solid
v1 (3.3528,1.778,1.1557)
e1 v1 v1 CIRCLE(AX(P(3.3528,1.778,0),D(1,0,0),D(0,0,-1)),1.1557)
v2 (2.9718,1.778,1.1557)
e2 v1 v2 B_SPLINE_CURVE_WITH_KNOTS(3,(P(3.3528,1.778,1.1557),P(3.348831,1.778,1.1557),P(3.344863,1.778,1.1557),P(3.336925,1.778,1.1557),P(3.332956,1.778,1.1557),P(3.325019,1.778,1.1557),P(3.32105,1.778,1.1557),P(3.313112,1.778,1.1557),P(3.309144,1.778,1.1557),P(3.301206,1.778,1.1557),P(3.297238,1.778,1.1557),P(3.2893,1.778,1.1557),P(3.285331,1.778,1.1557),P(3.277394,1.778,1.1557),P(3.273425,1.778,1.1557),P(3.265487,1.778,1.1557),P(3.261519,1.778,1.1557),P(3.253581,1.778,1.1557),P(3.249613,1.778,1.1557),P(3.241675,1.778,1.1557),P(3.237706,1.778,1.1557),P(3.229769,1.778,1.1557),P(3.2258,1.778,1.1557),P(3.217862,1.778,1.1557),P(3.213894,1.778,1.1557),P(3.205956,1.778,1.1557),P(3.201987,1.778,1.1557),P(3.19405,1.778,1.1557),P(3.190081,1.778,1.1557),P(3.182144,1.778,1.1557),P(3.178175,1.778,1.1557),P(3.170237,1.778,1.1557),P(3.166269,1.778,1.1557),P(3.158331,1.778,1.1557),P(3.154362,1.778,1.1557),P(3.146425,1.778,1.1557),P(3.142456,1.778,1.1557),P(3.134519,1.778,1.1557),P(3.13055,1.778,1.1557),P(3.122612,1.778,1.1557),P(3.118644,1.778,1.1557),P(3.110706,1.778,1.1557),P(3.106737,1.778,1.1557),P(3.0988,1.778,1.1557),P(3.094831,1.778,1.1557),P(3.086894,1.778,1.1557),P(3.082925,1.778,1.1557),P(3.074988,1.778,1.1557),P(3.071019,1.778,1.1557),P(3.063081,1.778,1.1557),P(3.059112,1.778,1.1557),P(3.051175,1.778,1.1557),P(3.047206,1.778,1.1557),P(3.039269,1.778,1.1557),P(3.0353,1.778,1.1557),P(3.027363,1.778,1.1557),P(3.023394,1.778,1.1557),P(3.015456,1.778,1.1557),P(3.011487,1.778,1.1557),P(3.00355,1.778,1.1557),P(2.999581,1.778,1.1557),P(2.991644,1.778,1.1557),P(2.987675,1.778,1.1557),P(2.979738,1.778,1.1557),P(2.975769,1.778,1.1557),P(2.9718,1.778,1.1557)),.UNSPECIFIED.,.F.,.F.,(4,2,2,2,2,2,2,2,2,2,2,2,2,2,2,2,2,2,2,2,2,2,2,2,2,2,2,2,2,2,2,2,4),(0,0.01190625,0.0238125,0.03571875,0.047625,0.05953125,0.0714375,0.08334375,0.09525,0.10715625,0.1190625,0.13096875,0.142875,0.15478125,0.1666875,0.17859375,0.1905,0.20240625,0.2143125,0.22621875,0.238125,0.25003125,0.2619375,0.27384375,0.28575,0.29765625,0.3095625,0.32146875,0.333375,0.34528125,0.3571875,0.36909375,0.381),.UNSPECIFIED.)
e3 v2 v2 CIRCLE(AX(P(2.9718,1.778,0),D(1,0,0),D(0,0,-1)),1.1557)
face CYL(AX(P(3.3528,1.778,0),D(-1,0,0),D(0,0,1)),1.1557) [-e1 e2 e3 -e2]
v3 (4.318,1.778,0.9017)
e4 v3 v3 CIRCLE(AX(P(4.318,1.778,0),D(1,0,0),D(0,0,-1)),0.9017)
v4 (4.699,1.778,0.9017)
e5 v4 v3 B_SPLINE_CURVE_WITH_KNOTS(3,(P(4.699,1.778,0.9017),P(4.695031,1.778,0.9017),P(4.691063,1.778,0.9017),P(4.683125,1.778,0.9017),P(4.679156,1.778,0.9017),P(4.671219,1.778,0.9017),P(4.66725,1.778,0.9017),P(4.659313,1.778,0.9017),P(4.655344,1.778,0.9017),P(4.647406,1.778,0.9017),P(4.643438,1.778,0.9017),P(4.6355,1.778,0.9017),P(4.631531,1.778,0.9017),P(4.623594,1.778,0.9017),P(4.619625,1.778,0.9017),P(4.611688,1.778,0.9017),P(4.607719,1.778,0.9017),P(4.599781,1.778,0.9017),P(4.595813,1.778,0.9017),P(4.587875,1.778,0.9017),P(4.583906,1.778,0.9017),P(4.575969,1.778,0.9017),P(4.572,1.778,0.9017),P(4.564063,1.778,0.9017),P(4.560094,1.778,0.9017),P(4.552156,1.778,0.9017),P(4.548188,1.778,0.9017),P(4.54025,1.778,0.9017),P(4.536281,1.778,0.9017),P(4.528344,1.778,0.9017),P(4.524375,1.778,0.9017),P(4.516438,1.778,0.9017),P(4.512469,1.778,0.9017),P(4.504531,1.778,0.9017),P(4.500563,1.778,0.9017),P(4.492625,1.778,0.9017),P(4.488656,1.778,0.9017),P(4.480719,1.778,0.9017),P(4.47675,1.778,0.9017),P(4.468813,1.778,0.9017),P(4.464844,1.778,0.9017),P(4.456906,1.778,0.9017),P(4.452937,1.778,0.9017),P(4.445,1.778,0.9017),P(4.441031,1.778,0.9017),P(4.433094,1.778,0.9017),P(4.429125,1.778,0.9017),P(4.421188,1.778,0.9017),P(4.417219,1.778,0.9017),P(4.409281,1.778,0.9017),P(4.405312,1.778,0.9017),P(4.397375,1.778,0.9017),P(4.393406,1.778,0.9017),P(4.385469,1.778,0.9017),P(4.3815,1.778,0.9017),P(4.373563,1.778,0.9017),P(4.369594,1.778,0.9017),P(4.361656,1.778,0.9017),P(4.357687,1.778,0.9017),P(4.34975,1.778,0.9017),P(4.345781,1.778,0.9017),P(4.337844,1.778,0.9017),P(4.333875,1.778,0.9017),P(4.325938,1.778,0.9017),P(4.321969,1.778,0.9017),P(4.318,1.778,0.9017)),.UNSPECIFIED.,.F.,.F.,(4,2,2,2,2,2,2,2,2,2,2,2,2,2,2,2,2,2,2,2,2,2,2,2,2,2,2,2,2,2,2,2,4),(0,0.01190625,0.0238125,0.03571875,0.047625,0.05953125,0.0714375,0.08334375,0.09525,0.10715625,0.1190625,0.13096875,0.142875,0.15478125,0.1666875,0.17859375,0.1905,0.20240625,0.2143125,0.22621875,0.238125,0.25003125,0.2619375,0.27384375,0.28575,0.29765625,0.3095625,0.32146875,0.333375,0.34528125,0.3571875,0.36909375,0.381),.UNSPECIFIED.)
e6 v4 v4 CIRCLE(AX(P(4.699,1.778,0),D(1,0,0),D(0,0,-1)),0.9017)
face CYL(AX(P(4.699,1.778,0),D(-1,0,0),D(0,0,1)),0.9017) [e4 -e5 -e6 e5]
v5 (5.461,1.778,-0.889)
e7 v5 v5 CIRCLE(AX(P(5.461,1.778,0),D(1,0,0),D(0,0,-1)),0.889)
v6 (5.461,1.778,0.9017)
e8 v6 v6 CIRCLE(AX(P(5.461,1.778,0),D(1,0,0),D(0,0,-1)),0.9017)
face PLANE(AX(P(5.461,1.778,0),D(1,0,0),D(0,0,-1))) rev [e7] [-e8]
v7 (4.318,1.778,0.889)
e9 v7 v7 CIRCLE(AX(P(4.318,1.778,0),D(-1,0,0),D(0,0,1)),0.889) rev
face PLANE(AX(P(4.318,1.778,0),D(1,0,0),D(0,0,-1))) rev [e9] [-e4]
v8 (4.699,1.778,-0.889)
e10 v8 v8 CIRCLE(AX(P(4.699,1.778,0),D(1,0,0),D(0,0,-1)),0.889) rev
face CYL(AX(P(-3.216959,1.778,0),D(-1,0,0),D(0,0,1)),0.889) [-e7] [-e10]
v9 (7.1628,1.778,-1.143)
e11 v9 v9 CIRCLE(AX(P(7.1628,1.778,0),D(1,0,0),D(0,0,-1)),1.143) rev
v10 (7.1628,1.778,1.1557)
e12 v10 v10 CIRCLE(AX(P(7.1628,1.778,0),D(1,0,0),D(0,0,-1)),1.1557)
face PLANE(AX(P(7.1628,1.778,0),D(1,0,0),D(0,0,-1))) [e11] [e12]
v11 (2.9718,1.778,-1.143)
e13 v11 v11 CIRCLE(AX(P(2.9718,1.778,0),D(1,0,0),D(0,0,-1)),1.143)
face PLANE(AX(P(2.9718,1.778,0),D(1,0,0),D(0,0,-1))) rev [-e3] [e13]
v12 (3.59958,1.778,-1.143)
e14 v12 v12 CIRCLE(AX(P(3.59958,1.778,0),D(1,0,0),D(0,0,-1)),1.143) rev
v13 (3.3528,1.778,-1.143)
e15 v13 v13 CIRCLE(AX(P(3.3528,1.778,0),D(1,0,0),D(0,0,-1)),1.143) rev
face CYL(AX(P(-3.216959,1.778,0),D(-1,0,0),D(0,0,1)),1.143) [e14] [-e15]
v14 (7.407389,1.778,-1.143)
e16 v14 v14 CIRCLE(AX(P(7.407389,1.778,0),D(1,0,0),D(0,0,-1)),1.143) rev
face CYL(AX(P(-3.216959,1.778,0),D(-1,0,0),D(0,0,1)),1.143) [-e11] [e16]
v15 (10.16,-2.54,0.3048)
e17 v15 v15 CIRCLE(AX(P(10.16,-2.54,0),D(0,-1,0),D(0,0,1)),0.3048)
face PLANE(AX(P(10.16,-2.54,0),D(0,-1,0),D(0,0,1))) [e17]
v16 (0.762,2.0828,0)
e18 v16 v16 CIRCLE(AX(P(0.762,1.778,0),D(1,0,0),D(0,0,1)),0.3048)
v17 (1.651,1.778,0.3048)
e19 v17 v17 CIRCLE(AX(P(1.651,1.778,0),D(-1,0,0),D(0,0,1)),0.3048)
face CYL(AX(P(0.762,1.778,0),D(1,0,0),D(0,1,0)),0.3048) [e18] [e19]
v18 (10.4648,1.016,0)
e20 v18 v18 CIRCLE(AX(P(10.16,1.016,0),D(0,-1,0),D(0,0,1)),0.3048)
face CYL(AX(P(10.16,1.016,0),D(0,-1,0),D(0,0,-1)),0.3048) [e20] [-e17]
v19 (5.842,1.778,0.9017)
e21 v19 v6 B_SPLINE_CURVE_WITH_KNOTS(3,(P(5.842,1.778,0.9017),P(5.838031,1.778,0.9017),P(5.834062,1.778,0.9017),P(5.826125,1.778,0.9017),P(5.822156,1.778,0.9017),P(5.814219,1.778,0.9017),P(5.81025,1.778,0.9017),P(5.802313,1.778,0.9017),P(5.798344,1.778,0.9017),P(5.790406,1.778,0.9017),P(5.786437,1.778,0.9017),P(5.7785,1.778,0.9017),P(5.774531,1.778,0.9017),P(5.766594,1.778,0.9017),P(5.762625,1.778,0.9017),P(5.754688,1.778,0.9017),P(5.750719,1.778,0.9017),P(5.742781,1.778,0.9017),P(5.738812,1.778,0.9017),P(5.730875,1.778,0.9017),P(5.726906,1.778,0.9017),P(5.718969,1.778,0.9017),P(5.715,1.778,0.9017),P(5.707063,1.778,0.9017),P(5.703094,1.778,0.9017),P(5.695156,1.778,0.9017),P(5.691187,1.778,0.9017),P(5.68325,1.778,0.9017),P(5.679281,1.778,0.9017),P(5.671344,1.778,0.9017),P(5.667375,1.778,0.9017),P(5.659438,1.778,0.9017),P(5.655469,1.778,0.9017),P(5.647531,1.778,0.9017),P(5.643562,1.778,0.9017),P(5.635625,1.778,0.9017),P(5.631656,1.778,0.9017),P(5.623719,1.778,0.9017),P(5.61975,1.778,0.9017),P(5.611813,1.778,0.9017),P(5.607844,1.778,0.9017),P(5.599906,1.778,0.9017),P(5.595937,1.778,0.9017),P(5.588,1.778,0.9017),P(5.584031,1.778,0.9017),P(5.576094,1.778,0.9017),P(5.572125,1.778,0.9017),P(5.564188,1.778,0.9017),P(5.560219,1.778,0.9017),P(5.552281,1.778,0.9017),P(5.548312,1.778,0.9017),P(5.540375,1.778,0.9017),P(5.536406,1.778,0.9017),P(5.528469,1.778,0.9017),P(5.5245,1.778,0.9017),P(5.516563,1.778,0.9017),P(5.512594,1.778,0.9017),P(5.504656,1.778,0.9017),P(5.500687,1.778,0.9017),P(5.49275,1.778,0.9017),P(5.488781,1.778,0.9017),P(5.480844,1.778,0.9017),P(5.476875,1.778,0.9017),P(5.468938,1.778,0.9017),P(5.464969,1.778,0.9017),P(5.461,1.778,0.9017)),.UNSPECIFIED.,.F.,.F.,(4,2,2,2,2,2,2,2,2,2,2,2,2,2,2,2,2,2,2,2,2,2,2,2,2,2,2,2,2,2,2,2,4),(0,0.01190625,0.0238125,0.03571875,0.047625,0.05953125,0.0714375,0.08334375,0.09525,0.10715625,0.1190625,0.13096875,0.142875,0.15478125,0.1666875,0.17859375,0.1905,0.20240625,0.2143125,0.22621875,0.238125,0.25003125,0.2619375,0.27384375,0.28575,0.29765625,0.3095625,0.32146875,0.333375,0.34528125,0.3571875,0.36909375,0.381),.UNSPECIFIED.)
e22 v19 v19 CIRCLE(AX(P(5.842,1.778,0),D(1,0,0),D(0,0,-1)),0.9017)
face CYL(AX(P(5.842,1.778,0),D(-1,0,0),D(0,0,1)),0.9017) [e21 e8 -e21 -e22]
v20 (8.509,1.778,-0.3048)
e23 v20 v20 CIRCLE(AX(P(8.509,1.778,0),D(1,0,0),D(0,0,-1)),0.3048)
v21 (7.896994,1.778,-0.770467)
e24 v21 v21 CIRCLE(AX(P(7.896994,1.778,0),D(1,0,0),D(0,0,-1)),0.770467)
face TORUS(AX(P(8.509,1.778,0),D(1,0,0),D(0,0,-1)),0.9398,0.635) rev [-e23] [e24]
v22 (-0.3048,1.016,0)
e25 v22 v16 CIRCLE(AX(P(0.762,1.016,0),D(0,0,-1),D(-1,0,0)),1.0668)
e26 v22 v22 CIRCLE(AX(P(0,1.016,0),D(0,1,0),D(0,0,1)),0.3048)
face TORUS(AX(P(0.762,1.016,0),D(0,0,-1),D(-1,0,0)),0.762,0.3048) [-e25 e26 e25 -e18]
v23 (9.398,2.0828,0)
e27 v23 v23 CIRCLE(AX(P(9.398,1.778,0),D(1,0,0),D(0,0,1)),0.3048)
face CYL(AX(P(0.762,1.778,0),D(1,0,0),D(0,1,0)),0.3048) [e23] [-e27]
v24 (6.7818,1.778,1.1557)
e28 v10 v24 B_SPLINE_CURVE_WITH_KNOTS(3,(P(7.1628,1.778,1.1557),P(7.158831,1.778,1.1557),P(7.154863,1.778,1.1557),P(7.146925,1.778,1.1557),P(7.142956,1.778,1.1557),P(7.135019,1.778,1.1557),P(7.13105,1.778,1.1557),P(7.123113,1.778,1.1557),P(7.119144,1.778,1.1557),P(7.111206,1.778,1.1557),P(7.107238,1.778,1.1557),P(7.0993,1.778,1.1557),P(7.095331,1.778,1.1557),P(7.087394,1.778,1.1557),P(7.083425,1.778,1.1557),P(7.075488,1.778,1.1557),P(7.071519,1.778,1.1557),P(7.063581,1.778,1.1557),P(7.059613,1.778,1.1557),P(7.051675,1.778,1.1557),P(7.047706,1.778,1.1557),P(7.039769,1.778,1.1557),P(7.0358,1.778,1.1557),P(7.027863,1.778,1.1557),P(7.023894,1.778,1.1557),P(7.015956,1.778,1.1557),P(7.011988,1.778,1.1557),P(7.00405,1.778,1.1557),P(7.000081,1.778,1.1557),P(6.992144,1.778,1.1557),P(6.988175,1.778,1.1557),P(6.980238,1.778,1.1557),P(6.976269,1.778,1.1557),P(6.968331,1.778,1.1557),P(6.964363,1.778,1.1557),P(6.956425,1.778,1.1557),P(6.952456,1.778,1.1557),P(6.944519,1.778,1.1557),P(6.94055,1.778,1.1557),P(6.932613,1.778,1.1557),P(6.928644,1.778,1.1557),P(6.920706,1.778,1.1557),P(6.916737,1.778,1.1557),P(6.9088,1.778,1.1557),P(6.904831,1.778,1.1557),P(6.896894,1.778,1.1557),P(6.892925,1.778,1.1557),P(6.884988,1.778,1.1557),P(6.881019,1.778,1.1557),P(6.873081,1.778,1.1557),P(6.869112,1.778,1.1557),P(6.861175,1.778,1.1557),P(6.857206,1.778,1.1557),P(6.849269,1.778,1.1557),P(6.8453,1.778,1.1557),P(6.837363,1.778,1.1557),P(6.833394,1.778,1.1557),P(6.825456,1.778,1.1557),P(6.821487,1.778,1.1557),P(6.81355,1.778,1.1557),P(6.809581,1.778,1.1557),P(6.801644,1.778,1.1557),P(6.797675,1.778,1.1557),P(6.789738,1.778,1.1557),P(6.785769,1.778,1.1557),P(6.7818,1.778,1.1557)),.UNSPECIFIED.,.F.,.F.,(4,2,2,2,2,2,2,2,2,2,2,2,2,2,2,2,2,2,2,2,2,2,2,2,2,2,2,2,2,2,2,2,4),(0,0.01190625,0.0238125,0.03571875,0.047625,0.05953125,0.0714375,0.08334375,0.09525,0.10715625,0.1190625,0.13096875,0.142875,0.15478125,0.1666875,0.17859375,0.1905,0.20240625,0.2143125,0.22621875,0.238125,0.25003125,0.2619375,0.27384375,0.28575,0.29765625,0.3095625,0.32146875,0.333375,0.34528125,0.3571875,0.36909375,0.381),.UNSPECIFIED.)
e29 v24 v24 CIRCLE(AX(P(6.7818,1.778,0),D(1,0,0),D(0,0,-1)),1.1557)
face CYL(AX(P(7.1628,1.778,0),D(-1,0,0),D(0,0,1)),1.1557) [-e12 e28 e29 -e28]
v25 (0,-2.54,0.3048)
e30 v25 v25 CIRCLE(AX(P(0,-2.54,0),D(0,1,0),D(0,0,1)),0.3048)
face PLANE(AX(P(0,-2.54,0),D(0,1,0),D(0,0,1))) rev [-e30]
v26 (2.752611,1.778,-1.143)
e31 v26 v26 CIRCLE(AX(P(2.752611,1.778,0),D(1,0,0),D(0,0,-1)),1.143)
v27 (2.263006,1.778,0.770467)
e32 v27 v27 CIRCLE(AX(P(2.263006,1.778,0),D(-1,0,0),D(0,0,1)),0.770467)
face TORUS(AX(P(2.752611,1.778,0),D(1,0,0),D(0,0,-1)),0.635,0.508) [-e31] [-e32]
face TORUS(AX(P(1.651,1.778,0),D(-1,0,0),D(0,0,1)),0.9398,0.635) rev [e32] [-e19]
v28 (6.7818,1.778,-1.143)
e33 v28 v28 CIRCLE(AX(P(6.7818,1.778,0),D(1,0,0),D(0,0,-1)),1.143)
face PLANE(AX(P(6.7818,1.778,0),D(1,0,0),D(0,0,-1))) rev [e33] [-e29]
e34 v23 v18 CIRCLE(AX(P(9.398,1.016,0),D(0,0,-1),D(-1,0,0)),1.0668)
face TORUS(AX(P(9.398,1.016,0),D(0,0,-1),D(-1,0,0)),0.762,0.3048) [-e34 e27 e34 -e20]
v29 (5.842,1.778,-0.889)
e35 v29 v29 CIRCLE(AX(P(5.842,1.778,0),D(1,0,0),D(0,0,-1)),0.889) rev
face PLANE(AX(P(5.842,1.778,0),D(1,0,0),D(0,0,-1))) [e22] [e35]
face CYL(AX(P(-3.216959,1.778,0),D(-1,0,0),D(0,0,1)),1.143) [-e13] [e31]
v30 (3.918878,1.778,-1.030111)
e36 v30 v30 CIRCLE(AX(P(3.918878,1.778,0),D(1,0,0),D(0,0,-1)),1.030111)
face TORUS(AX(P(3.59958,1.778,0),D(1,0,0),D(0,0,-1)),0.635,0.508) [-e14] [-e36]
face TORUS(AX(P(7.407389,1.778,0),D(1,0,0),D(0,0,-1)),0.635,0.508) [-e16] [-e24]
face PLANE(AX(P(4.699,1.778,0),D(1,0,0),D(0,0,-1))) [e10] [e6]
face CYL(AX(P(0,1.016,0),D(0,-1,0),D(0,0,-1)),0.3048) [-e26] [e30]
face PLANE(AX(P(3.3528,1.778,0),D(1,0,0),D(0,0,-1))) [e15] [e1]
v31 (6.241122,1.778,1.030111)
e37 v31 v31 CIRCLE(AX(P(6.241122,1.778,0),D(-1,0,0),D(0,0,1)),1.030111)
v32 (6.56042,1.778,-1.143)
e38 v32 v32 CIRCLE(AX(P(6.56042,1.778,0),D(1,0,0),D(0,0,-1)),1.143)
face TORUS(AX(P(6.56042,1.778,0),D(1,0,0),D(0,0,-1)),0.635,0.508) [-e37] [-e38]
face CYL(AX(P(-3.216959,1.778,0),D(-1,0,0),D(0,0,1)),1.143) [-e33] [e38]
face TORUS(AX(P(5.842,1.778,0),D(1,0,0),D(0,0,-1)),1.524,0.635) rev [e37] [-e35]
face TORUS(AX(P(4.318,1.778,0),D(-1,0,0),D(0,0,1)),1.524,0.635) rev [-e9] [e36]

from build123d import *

# Parameters (mm, degrees)
SKETCH3_R           = 0.3048
FILLET5_R           = 0.635
FILLET6_R           = 0.508
SKETCH5_R           = 1.1557
SKETCH5_R_2         = 1.143
EXTRUDE_THIN1_DEPTH = 0.381
SKETCH6_R           = 0.9017
SKETCH6_R_2         = 0.889
EXTRUDE_THIN2_DEPTH = 0.381
SKETCH7_R           = 0.9017
SKETCH7_R_2         = 0.889
EXTRUDE_THIN3_DEPTH = 0.381
SKETCH8_R           = 1.1557
SKETCH8_R_2         = 1.143
EXTRUDE_THIN4_DEPTH = 0.381


with BuildPart() as part:
    # Base-Sweep: sweep along a path in Sketch1
    with BuildLine(Plane.XY) as base_sweep_path:
        Line((0, -2.54), (0, 1.016))
        ThreePointArc((0, 1.016), (0.223184633, 1.554815367), (0.762, 1.778))
        Line((0.762, 1.778), (9.398, 1.778))
        ThreePointArc((9.398, 1.778), (9.936815367, 1.554815367), (10.16, 1.016))
        Line((10.16, 1.016), (10.16, -2.54))
    # Sketch3 → Base-Sweep (sweep)
    with BuildSketch(Plane(origin=(0, -2.54, 0), x_dir=(-1, 0, 0), z_dir=(0, 1, 0))):
        Circle(SKETCH3_R)
    sweep(path=base_sweep_path.line)

    # Sketch4 → Revolve1 (revolve)
    with BuildSketch(Plane.XY, mode=Mode.PRIVATE) as revolve1_sk:
        Polygon((2.286, 2.921), (2.286, 2.0828), (7.874, 2.0828), (7.874, 2.921), (6.35, 2.921), (6.35, 2.667), (3.81, 2.667), (3.81, 2.921), align=None)
    revolve(revolve1_sk.sketch.rotate(Axis((-3.216958819, 1.778, 0), (1, 0, 0)), 90), axis=Axis((-3.216958819, 1.778, 0), (1, 0, 0)))

    # Fillet5
    # the kernel refuses this fillet: 0.635 mm, written as the material it adds along each edge
    with BuildSketch(Plane(origin=(2.286, 1.778, 0), x_dir=(0, 1, 0), z_dir=(0, 0, 1))) as fillet5_piece_1:
        with BuildLine():
            CenterArc((0.3048 + FILLET5_R, FILLET5_R), FILLET5_R, 180, 90)
            Line((0.3048 + FILLET5_R, 0), (0.3048 + FILLET5_R, -FILLET5_R * 0.02))
            Line((0.3048 + FILLET5_R, -FILLET5_R * 0.02), (0.3048 - FILLET5_R * 0.02, -FILLET5_R * 0.02))
            Line((0.3048 - FILLET5_R * 0.02, -FILLET5_R * 0.02), (0.3048 - FILLET5_R * 0.02, FILLET5_R))
            Line((0.3048 - FILLET5_R * 0.02, FILLET5_R), (0.3048, FILLET5_R))
        make_face()
    revolve(axis=Axis((2.286, 1.778, 0), (-1, 0, 0)))
    with BuildSketch(Plane(origin=(7.874, 1.778, 0), x_dir=(0, 1, 0), z_dir=(0, 0, 1))) as fillet5_piece_2:
        with BuildLine():
            CenterArc((0.3048 + FILLET5_R, -FILLET5_R), FILLET5_R, 90, 90)
            Line((0.3048, -FILLET5_R), (0.3048 - FILLET5_R * 0.02, -FILLET5_R))
            Line((0.3048 - FILLET5_R * 0.02, -FILLET5_R), (0.3048 - FILLET5_R * 0.02, FILLET5_R * 0.02))
            Line((0.3048 - FILLET5_R * 0.02, FILLET5_R * 0.02), (0.3048 + FILLET5_R, FILLET5_R * 0.02))
            Line((0.3048 + FILLET5_R, FILLET5_R * 0.02), (0.3048 + FILLET5_R, 0))
        make_face()
    revolve(axis=Axis((7.874, 1.778, 0), (-1, 0, 0)))
    with BuildSketch(Plane(origin=(6.35, 1.778, 0), x_dir=(0, 0, 1), z_dir=(0, 1, 0))) as fillet5_piece_3:
        with BuildLine():
            CenterArc((1.524, -0.508), FILLET5_R, 126.869897645, 53.130102355)
            Line((1.143, 0), (1.13538, 0.01016))
            ThreePointArc((1.13538, 0.01016), (1.016, 0.0127), (0.889, 0.0127))
            Line((0.889, 0.0127), (0.8763, 0))
            Line((0.8763, 0), (0.8763, -0.508))
            Line((0.8763, -0.508), (0.889, -0.508))
        make_face()
    revolve(axis=Axis((6.35, 1.778, 0), (1, 0, 0)))
    with BuildSketch(Plane(origin=(3.81, 1.778, 0), x_dir=(0, 0, 1), z_dir=(0, 1, 0))) as fillet5_piece_4:
        with BuildLine():
            CenterArc((1.524, 0.508), FILLET5_R, 180, 53.130102355)
            Line((0.889, 0.508), (0.8763, 0.508))
            Line((0.8763, 0.508), (0.8763, 0))
            Line((0.8763, 0), (0.889, -0.0127))
            ThreePointArc((0.889, -0.0127), (1.016, -0.0127), (1.13538, -0.01016))
            Line((1.13538, -0.01016), (1.143, 0))
        make_face()
    revolve(axis=Axis((3.81, 1.778, 0), (1, 0, 0)))

    # Fillet6
    fillet6_edges = [part.edges().sort_by_distance(p)[0] for p in [
        (7.874, 1.778, -1.143),
        (6.35, 1.778, -1.143),
        (3.81, 1.778, -1.143),
        (2.286, 1.778, -1.143),
    ]]
    fillet(fillet6_edges, radius=FILLET6_R)

    # Sketch5 → Extrude-Thin1 (add)
    with BuildSketch(Plane(origin=(2.9718, 0, 0), x_dir=(0, 0, -1), z_dir=(1, 0, 0))):
        with Locations((0, 1.778)):
            Circle(SKETCH5_R)
        with Locations((0, 1.778)):
            Circle(SKETCH5_R_2, mode=Mode.SUBTRACT)
    extrude(amount=EXTRUDE_THIN1_DEPTH)

    # Sketch6 → Extrude-Thin2 (add)
    with BuildSketch(Plane(origin=(4.318, 0, 0), x_dir=(0, 0, -1), z_dir=(1, 0, 0))):
        with Locations((0, 1.778)):
            Circle(SKETCH6_R)
        with Locations((0, 1.778)):
            Circle(SKETCH6_R_2, mode=Mode.SUBTRACT)
    extrude(amount=EXTRUDE_THIN2_DEPTH)

    # Sketch7 → Extrude-Thin3 (add)
    with BuildSketch(Plane(origin=(5.461, 0, 0), x_dir=(0, 0, -1), z_dir=(1, 0, 0))):
        with Locations((0, 1.778)):
            Circle(SKETCH7_R)
        with Locations((0, 1.778)):
            Circle(SKETCH7_R_2, mode=Mode.SUBTRACT)
    extrude(amount=EXTRUDE_THIN3_DEPTH)

    # Sketch8 → Extrude-Thin4 (add)
    with BuildSketch(Plane(origin=(6.7818, 0, 0), x_dir=(0, 0, -1), z_dir=(1, 0, 0))):
        with Locations((0, 1.778)):
            Circle(SKETCH8_R)
        with Locations((0, 1.778)):
            Circle(SKETCH8_R_2, mode=Mode.SUBTRACT)
    extrude(amount=EXTRUDE_THIN4_DEPTH)


solid = part.part
